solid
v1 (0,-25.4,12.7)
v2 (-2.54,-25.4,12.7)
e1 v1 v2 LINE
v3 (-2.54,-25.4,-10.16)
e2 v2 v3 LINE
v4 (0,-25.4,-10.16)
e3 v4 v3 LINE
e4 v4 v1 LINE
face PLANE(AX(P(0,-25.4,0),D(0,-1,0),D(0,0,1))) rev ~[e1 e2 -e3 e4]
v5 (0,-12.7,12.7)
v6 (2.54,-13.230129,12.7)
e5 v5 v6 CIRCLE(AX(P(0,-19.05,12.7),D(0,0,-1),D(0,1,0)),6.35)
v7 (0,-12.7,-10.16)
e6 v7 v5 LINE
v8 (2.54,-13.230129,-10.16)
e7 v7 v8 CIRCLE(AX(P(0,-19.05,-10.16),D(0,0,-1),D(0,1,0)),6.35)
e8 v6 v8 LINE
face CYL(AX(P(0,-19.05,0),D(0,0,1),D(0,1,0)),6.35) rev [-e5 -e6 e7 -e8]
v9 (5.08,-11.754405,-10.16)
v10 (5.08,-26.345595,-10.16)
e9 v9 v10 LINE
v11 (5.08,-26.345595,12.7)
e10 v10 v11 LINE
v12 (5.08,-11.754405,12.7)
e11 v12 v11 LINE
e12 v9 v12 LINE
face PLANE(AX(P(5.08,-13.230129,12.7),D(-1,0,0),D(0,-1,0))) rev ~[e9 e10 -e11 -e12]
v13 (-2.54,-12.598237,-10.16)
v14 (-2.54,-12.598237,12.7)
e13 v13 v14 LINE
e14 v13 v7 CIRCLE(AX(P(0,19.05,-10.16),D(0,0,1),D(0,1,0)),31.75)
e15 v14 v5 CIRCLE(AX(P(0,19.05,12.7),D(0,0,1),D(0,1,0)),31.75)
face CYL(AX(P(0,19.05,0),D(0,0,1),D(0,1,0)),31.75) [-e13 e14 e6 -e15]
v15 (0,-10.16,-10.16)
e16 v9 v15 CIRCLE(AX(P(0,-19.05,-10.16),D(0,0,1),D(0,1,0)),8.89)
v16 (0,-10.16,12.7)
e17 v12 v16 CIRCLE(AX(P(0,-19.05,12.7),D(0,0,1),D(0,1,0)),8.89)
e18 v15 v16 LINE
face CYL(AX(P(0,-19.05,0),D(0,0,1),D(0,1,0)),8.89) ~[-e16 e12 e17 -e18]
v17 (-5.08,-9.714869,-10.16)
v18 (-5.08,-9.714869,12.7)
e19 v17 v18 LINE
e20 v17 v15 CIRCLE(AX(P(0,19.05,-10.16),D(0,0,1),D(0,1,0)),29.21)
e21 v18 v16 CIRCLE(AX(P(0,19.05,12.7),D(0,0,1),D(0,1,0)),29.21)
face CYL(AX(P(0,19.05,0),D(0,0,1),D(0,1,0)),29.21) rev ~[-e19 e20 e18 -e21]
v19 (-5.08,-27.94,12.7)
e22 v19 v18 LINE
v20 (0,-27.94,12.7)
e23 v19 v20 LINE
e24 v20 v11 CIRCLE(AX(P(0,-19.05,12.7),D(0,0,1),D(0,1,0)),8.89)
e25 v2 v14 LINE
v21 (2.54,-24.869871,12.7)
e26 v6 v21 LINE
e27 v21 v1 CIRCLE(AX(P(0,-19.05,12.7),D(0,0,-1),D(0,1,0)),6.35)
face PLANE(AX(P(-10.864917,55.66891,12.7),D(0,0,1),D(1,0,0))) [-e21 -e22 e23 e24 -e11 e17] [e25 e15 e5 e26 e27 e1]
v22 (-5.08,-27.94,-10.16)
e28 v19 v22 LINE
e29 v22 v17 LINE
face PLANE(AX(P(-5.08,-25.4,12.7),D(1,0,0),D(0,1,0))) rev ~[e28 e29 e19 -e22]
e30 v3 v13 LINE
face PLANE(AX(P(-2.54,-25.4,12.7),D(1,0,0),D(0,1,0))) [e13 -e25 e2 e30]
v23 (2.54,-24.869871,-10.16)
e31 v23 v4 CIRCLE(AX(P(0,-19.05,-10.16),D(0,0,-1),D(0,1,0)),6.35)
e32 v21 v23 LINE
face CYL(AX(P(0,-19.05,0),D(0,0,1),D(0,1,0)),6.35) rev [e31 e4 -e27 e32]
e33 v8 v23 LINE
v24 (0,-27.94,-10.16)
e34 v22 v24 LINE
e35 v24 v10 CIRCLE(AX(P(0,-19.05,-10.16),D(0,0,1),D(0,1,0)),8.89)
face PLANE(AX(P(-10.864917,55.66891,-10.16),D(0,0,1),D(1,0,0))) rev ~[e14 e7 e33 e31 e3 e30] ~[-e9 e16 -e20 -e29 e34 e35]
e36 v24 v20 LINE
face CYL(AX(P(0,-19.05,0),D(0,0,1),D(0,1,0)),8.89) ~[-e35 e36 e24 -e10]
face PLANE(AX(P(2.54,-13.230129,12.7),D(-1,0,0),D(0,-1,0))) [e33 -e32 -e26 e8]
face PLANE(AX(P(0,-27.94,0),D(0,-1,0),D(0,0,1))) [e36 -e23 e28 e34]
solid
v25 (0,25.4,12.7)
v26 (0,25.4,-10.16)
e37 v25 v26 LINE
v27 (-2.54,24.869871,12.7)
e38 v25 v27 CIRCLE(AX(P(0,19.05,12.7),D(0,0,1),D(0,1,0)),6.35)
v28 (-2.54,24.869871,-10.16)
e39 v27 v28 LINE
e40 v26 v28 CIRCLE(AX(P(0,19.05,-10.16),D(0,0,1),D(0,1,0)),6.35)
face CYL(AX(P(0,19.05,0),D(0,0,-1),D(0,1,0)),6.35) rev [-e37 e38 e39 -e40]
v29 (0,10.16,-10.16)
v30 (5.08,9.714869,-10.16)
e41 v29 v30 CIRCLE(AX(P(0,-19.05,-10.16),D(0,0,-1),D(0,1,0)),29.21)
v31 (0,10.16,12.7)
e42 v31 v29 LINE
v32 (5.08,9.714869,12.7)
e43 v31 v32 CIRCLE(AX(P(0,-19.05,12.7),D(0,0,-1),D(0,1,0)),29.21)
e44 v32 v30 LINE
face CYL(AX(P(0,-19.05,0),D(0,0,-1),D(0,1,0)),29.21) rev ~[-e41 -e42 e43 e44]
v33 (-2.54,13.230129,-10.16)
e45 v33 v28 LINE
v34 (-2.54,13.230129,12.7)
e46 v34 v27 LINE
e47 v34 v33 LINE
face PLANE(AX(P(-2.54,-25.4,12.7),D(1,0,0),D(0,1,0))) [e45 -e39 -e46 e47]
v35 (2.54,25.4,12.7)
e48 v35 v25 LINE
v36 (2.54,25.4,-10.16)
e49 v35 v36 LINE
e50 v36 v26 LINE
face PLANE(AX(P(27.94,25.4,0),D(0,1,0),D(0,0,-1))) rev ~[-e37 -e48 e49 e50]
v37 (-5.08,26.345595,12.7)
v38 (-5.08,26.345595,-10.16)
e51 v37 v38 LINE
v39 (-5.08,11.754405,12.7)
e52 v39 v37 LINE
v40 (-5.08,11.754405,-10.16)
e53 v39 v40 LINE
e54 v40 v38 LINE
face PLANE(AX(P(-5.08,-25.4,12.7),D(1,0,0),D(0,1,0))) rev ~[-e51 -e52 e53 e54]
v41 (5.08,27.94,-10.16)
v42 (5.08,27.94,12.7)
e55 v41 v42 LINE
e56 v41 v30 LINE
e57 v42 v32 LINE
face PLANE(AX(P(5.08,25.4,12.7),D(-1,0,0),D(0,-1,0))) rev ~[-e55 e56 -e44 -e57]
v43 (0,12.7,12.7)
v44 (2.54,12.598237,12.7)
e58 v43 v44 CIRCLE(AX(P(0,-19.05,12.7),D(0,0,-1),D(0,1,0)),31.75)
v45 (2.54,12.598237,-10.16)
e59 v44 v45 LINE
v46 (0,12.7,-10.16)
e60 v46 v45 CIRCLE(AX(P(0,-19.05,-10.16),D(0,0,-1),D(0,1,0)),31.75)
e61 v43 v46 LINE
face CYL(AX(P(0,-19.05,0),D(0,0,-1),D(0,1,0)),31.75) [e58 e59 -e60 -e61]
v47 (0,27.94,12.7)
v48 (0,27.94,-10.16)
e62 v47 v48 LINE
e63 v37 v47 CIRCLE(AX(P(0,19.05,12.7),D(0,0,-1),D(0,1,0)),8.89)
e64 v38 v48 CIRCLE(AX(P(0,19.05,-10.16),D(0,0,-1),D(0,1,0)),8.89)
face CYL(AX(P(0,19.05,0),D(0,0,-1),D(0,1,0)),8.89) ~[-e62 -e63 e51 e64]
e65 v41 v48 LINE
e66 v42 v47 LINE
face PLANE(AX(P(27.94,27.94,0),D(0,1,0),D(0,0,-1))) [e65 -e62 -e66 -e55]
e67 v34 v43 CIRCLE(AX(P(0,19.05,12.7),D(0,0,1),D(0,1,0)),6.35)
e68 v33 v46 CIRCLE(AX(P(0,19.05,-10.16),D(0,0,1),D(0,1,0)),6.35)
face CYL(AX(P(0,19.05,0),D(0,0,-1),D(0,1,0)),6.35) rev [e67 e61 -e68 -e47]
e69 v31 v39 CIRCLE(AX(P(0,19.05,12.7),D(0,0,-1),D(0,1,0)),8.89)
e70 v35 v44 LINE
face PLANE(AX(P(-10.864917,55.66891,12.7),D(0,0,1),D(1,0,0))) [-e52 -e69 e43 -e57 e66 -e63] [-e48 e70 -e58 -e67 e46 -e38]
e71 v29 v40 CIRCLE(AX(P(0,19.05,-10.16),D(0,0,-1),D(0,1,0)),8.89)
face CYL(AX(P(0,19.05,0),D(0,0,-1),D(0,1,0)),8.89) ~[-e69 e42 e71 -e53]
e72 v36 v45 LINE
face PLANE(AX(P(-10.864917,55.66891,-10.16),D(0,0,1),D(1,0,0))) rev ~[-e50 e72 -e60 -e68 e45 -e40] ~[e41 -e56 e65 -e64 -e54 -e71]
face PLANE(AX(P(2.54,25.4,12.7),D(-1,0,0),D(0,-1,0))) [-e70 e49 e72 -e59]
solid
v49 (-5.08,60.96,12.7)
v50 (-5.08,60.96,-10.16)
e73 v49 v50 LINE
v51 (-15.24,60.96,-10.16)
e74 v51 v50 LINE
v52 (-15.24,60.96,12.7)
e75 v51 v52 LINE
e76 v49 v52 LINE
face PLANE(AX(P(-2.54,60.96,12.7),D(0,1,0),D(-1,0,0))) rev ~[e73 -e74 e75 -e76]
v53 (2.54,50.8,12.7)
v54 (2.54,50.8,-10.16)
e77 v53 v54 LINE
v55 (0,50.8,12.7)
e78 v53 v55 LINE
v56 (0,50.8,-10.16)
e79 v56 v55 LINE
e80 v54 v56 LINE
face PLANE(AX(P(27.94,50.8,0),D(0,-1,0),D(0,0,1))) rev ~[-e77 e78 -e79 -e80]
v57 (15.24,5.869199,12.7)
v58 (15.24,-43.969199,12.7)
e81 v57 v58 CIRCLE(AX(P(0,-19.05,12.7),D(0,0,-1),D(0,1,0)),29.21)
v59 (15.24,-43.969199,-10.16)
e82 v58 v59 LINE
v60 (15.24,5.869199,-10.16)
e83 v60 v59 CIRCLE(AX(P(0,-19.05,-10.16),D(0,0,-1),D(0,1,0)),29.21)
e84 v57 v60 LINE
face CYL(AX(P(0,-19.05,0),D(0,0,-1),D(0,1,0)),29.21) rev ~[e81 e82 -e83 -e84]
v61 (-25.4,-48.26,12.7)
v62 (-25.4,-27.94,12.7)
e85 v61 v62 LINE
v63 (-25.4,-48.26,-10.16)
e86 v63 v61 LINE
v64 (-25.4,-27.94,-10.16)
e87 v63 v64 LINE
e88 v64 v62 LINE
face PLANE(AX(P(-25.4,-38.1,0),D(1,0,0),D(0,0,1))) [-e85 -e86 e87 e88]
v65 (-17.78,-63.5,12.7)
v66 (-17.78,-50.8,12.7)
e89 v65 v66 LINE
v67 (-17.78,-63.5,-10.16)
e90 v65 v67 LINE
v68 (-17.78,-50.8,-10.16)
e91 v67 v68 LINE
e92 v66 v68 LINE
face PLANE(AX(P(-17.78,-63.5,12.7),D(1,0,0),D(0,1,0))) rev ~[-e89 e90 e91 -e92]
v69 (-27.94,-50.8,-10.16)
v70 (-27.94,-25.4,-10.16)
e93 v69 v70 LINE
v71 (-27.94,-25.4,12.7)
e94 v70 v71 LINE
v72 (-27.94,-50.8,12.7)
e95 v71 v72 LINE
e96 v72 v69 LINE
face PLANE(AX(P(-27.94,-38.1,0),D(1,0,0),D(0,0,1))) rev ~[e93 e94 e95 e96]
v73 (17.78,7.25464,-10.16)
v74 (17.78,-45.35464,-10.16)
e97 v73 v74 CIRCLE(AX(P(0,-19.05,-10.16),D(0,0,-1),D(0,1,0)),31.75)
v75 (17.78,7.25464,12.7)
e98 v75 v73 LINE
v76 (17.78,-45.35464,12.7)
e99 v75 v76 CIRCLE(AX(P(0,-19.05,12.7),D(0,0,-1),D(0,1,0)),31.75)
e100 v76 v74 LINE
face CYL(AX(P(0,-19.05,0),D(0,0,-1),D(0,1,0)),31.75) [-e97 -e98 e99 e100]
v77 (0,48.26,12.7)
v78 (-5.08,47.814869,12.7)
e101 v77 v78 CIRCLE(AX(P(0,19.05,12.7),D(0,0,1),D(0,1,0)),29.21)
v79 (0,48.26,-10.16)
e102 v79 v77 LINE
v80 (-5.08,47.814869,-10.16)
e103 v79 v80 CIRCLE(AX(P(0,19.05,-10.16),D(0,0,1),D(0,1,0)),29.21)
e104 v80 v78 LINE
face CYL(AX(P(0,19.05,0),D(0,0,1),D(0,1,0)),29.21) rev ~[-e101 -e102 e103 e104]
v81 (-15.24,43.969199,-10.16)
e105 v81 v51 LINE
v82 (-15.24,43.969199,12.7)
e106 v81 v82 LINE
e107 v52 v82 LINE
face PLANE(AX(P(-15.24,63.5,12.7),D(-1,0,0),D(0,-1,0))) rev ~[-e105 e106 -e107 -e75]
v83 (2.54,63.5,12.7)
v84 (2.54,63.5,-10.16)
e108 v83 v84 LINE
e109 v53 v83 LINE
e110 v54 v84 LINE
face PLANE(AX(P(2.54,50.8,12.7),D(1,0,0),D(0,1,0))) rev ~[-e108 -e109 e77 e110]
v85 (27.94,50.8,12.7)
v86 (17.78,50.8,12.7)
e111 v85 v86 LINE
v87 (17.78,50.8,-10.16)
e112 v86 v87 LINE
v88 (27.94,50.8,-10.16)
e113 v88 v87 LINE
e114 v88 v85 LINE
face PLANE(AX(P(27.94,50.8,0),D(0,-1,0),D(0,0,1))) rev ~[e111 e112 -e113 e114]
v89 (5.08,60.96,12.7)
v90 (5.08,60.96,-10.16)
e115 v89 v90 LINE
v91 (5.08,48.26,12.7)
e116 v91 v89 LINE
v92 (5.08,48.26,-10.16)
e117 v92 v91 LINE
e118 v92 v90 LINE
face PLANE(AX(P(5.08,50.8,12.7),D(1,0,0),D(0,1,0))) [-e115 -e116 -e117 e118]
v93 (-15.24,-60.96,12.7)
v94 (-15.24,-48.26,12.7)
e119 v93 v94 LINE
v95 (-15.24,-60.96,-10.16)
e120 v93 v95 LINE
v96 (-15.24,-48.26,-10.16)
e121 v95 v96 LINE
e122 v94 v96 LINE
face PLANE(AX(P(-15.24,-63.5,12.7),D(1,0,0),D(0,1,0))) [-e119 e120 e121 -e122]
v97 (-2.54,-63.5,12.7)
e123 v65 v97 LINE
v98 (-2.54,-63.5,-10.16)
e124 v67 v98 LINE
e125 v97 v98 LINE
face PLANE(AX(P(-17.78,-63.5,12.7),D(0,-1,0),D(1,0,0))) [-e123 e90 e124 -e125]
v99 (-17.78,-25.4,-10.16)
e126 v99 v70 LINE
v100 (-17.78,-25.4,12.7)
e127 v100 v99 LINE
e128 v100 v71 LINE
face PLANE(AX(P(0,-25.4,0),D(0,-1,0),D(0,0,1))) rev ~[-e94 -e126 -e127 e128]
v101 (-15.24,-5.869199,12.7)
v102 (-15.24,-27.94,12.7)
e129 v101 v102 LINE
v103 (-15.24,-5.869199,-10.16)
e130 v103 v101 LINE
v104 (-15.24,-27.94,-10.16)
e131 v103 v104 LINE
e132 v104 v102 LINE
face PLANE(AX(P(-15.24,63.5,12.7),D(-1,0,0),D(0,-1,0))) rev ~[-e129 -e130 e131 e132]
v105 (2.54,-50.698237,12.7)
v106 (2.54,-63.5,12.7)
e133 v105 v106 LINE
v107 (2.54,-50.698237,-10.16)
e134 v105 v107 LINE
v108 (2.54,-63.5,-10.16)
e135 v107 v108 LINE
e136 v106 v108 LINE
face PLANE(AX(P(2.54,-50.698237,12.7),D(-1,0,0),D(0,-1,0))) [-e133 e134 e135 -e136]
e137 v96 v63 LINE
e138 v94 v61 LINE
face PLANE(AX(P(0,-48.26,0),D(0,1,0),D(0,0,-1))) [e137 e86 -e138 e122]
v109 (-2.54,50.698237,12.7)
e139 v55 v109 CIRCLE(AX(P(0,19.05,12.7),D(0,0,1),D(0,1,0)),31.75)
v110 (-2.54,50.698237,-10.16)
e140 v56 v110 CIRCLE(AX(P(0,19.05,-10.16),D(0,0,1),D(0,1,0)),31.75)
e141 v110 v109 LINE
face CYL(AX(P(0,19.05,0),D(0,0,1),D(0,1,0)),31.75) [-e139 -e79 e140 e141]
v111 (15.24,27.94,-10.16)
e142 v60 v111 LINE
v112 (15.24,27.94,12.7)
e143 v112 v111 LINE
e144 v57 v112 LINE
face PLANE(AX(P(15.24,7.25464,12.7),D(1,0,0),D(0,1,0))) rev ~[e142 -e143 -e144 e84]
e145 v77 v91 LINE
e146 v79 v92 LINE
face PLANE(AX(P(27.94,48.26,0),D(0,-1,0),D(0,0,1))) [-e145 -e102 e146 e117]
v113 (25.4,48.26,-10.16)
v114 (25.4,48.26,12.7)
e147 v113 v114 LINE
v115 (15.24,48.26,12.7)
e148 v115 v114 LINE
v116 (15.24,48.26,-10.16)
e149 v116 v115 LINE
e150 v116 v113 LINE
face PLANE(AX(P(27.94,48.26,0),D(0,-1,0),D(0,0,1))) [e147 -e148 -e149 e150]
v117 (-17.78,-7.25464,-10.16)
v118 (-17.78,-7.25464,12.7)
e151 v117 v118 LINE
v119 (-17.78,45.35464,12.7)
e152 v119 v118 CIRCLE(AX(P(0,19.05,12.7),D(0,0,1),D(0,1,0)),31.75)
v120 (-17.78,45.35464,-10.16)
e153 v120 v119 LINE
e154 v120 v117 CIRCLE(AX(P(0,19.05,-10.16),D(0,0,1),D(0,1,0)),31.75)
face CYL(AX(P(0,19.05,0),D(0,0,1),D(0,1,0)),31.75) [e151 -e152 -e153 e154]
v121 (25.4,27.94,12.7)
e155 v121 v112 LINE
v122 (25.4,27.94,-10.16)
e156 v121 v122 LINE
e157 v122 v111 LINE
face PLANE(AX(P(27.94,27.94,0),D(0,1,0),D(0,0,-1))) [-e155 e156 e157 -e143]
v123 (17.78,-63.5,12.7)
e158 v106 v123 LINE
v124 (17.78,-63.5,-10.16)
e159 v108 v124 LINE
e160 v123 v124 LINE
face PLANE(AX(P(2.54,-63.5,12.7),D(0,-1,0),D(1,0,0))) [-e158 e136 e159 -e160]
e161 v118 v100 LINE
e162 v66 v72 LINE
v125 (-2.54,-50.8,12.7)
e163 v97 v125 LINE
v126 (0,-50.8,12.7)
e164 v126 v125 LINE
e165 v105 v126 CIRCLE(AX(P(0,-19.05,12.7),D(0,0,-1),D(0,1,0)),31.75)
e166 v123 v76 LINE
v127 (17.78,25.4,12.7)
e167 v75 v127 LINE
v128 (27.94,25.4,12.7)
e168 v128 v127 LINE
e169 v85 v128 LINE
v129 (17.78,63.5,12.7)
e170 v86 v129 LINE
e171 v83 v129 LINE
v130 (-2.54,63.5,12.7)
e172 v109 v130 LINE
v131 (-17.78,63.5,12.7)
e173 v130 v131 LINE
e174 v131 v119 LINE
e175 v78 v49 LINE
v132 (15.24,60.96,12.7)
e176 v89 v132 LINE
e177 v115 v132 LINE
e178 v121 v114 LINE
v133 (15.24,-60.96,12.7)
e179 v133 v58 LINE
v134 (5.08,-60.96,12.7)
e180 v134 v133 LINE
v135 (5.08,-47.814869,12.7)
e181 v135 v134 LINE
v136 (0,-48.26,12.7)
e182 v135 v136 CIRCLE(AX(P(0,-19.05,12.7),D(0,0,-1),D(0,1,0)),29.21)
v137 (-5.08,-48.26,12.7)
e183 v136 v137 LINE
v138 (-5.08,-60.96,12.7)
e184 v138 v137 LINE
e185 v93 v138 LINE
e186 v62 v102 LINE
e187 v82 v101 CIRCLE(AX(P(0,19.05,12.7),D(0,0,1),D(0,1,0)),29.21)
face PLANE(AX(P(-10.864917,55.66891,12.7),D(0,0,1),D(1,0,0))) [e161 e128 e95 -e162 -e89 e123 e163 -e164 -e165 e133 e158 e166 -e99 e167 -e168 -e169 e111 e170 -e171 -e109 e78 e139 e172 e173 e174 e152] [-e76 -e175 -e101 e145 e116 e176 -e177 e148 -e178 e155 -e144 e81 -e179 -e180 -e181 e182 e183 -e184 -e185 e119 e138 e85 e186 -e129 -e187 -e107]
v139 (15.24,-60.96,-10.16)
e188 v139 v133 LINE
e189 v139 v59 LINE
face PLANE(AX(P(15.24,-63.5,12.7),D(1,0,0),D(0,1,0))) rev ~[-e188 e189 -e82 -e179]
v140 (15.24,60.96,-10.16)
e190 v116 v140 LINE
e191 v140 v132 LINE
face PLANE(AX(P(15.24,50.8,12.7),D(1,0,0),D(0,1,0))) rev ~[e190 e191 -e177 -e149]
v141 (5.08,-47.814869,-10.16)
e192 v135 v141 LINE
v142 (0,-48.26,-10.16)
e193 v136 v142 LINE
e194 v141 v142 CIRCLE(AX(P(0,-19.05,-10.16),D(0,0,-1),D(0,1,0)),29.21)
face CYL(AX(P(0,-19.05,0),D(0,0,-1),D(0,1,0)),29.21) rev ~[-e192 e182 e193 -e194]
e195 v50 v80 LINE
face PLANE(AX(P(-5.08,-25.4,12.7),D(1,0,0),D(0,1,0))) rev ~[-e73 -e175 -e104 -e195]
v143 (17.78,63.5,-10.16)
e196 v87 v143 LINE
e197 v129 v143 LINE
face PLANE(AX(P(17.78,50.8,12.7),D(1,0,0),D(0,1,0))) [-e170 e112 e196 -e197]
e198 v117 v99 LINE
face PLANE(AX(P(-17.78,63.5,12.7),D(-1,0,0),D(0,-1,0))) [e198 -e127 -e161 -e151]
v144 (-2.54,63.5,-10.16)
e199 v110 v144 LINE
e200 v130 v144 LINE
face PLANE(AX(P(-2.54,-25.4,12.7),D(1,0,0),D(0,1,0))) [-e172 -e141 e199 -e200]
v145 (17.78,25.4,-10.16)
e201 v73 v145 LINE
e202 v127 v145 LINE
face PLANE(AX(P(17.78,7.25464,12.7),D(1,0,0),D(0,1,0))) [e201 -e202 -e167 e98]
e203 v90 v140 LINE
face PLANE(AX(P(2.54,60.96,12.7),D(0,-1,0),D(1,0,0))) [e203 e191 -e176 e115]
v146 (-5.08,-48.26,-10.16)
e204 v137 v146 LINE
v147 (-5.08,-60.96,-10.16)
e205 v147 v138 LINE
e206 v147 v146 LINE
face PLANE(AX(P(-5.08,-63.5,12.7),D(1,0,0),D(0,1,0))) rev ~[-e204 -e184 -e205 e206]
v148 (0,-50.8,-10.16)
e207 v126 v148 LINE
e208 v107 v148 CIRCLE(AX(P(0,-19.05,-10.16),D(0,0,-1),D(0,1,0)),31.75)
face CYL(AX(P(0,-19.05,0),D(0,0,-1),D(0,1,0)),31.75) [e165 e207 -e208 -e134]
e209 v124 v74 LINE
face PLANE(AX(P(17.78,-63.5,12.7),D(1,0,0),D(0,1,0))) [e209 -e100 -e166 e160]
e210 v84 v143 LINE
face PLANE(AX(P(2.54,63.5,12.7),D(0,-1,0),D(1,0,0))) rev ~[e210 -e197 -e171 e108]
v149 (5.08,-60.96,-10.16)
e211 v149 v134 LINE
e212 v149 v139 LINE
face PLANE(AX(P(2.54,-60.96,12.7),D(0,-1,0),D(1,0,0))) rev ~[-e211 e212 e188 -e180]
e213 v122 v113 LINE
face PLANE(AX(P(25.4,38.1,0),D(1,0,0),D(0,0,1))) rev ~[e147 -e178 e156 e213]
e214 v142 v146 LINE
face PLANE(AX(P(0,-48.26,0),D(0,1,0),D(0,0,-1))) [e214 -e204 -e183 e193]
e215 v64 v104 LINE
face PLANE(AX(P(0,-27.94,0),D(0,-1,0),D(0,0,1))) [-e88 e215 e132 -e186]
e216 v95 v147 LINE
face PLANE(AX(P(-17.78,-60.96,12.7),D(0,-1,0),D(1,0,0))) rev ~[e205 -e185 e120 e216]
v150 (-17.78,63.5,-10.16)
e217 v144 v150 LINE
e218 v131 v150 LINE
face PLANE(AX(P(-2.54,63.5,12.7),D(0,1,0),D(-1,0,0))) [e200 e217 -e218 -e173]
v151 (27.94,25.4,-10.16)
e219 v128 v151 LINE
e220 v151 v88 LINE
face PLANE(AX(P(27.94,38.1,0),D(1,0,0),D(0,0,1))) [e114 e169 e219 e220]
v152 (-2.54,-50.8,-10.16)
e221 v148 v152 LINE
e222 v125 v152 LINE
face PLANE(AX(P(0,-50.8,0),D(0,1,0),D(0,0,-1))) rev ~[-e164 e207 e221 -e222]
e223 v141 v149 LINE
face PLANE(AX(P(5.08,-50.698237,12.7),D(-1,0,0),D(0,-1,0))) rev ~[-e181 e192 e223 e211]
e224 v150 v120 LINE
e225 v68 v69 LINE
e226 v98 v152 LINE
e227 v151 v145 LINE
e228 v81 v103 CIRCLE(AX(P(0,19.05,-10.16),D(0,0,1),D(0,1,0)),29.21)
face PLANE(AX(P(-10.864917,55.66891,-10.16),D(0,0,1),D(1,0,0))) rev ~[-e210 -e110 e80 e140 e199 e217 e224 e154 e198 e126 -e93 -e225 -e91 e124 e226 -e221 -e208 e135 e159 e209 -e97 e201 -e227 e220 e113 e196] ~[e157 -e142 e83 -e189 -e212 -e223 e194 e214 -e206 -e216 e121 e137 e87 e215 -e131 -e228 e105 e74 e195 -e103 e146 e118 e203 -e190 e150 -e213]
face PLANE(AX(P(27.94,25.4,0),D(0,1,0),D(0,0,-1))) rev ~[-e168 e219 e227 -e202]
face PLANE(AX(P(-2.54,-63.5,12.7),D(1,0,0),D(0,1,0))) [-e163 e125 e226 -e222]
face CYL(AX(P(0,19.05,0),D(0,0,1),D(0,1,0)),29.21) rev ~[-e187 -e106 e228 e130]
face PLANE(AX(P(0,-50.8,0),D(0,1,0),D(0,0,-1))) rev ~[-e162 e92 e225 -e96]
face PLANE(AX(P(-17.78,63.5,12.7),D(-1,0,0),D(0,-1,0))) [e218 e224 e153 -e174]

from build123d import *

# Parameters (mm, degrees)
F2_W     = 25.4
F2_H     = 25.4
F4_W     = 15.24
F4_H     = 12.7
F5_DEPTH = 25.4
F6_T     = -2.54
F7_DEPTH = 2.54


with BuildPart() as f3:
    # F3: sweep along a path in F0
    with BuildLine(Plane.XY) as f3_path:
        Line((27.94, 38.1), (0, 38.1))
        ThreePointArc((0, 38.1), (-19.05, 19.05), (0, 0))
        ThreePointArc((0, 0), (19.05, -19.05), (0, -38.1))
        Line((0, -38.1), (-27.94, -38.1))
    # F2 (on offset) → F3 (sweep)
    with BuildSketch(Plane.YZ.offset(27.94)):
        with Locations((38.1, 0)):
            Rectangle(F2_W, F2_H)
    sweep(path=f3_path.line)

    # F4 (on face) → F5 (join)
    with BuildSketch(Plane.XY.offset(12.7)):
        with BuildLine():
            Line((-2.54, 63.5), (-17.78, 63.5))
            Line((-17.78, 63.5), (-17.78, 45.3546402751))
            ThreePointArc((-17.78, 45.3546402751), (-10.5054322267, 49.0116153391), (-2.54, 50.6982369177))
            Line((-2.54, 50.6982369177), (-2.54, 63.5))
        make_face()
        with BuildLine():
            ThreePointArc((-2.54, 50.6982369177), (-10.5054322267, 49.0116153391), (-17.78, 45.3546402751))
            Line((-17.78, 45.3546402751), (-17.78, -7.2546402751))
            ThreePointArc((-17.78, -7.2546402751), (-10.5054322267, -10.9116153391), (-2.54, -12.5982369177))
            Line((-2.54, -12.5982369177), (-2.54, 13.2301288674))
            ThreePointArc((-2.54, 13.2301288674), (-6.35, 19.05), (-2.54, 24.8698711326))
            Line((-2.54, 24.8698711326), (-2.54, 50.6982369177))
        make_face()
        with BuildLine():
            ThreePointArc((-2.54, -12.5982369177), (-10.5054322267, -10.9116153391), (-17.78, -7.2546402751))
            Line((-17.78, -7.2546402751), (-17.78, -25.4))
            Line((-17.78, -25.4), (-2.54, -25.4))
            Line((-2.54, -25.4), (-2.54, -12.5982369177))
        make_face()
        with BuildLine():
            Line((-2.54, 13.2301288674), (-2.54, 24.8698711326))
            ThreePointArc((-2.54, 24.8698711326), (-6.35, 19.05), (-2.54, 13.2301288674))
        make_face()
        with Locations((10.16, 57.15)):
            Rectangle(F4_W, F4_H)
        with Locations((-10.16, -57.15)):
            Rectangle(F4_W, F4_H)
        with BuildLine():
            Line((17.78, 25.4), (2.54, 25.4))
            Line((2.54, 25.4), (2.54, 12.5982369177))
            ThreePointArc((2.54, 12.5982369177), (10.5054322267, 10.9116153391), (17.78, 7.2546402751))
            Line((17.78, 7.2546402751), (17.78, 25.4))
        make_face()
        with BuildLine():
            ThreePointArc((2.54, -24.8698711326), (6.35, -19.05), (2.54, -13.2301288674))
            Line((2.54, -13.2301288674), (2.54, -24.8698711326))
        make_face()
        with BuildLine():
            ThreePointArc((17.78, -45.3546402751), (10.5054322267, -49.0116153391), (2.54, -50.6982369177))
            Line((2.54, -50.6982369177), (2.54, -63.5))
            Line((2.54, -63.5), (17.78, -63.5))
            Line((17.78, -63.5), (17.78, -45.3546402751))
        make_face()
    extrude(amount=-F5_DEPTH)

    # F6
    f6_openings = [f3.faces().sort_by_distance(p)[0] for p in [
        (0, 0, 12.7),
    ]]
    offset(amount=F6_T, openings=f6_openings, kind=Kind.INTERSECTION)

    # F7 (cut): a face of the model
    f7_faces = [f3.faces().sort_by_distance(p)[0] for p in [
        (0, 0, -12.7),
    ]]
    extrude(f7_faces, amount=-F7_DEPTH, mode=Mode.SUBTRACT)


solid = f3.part
